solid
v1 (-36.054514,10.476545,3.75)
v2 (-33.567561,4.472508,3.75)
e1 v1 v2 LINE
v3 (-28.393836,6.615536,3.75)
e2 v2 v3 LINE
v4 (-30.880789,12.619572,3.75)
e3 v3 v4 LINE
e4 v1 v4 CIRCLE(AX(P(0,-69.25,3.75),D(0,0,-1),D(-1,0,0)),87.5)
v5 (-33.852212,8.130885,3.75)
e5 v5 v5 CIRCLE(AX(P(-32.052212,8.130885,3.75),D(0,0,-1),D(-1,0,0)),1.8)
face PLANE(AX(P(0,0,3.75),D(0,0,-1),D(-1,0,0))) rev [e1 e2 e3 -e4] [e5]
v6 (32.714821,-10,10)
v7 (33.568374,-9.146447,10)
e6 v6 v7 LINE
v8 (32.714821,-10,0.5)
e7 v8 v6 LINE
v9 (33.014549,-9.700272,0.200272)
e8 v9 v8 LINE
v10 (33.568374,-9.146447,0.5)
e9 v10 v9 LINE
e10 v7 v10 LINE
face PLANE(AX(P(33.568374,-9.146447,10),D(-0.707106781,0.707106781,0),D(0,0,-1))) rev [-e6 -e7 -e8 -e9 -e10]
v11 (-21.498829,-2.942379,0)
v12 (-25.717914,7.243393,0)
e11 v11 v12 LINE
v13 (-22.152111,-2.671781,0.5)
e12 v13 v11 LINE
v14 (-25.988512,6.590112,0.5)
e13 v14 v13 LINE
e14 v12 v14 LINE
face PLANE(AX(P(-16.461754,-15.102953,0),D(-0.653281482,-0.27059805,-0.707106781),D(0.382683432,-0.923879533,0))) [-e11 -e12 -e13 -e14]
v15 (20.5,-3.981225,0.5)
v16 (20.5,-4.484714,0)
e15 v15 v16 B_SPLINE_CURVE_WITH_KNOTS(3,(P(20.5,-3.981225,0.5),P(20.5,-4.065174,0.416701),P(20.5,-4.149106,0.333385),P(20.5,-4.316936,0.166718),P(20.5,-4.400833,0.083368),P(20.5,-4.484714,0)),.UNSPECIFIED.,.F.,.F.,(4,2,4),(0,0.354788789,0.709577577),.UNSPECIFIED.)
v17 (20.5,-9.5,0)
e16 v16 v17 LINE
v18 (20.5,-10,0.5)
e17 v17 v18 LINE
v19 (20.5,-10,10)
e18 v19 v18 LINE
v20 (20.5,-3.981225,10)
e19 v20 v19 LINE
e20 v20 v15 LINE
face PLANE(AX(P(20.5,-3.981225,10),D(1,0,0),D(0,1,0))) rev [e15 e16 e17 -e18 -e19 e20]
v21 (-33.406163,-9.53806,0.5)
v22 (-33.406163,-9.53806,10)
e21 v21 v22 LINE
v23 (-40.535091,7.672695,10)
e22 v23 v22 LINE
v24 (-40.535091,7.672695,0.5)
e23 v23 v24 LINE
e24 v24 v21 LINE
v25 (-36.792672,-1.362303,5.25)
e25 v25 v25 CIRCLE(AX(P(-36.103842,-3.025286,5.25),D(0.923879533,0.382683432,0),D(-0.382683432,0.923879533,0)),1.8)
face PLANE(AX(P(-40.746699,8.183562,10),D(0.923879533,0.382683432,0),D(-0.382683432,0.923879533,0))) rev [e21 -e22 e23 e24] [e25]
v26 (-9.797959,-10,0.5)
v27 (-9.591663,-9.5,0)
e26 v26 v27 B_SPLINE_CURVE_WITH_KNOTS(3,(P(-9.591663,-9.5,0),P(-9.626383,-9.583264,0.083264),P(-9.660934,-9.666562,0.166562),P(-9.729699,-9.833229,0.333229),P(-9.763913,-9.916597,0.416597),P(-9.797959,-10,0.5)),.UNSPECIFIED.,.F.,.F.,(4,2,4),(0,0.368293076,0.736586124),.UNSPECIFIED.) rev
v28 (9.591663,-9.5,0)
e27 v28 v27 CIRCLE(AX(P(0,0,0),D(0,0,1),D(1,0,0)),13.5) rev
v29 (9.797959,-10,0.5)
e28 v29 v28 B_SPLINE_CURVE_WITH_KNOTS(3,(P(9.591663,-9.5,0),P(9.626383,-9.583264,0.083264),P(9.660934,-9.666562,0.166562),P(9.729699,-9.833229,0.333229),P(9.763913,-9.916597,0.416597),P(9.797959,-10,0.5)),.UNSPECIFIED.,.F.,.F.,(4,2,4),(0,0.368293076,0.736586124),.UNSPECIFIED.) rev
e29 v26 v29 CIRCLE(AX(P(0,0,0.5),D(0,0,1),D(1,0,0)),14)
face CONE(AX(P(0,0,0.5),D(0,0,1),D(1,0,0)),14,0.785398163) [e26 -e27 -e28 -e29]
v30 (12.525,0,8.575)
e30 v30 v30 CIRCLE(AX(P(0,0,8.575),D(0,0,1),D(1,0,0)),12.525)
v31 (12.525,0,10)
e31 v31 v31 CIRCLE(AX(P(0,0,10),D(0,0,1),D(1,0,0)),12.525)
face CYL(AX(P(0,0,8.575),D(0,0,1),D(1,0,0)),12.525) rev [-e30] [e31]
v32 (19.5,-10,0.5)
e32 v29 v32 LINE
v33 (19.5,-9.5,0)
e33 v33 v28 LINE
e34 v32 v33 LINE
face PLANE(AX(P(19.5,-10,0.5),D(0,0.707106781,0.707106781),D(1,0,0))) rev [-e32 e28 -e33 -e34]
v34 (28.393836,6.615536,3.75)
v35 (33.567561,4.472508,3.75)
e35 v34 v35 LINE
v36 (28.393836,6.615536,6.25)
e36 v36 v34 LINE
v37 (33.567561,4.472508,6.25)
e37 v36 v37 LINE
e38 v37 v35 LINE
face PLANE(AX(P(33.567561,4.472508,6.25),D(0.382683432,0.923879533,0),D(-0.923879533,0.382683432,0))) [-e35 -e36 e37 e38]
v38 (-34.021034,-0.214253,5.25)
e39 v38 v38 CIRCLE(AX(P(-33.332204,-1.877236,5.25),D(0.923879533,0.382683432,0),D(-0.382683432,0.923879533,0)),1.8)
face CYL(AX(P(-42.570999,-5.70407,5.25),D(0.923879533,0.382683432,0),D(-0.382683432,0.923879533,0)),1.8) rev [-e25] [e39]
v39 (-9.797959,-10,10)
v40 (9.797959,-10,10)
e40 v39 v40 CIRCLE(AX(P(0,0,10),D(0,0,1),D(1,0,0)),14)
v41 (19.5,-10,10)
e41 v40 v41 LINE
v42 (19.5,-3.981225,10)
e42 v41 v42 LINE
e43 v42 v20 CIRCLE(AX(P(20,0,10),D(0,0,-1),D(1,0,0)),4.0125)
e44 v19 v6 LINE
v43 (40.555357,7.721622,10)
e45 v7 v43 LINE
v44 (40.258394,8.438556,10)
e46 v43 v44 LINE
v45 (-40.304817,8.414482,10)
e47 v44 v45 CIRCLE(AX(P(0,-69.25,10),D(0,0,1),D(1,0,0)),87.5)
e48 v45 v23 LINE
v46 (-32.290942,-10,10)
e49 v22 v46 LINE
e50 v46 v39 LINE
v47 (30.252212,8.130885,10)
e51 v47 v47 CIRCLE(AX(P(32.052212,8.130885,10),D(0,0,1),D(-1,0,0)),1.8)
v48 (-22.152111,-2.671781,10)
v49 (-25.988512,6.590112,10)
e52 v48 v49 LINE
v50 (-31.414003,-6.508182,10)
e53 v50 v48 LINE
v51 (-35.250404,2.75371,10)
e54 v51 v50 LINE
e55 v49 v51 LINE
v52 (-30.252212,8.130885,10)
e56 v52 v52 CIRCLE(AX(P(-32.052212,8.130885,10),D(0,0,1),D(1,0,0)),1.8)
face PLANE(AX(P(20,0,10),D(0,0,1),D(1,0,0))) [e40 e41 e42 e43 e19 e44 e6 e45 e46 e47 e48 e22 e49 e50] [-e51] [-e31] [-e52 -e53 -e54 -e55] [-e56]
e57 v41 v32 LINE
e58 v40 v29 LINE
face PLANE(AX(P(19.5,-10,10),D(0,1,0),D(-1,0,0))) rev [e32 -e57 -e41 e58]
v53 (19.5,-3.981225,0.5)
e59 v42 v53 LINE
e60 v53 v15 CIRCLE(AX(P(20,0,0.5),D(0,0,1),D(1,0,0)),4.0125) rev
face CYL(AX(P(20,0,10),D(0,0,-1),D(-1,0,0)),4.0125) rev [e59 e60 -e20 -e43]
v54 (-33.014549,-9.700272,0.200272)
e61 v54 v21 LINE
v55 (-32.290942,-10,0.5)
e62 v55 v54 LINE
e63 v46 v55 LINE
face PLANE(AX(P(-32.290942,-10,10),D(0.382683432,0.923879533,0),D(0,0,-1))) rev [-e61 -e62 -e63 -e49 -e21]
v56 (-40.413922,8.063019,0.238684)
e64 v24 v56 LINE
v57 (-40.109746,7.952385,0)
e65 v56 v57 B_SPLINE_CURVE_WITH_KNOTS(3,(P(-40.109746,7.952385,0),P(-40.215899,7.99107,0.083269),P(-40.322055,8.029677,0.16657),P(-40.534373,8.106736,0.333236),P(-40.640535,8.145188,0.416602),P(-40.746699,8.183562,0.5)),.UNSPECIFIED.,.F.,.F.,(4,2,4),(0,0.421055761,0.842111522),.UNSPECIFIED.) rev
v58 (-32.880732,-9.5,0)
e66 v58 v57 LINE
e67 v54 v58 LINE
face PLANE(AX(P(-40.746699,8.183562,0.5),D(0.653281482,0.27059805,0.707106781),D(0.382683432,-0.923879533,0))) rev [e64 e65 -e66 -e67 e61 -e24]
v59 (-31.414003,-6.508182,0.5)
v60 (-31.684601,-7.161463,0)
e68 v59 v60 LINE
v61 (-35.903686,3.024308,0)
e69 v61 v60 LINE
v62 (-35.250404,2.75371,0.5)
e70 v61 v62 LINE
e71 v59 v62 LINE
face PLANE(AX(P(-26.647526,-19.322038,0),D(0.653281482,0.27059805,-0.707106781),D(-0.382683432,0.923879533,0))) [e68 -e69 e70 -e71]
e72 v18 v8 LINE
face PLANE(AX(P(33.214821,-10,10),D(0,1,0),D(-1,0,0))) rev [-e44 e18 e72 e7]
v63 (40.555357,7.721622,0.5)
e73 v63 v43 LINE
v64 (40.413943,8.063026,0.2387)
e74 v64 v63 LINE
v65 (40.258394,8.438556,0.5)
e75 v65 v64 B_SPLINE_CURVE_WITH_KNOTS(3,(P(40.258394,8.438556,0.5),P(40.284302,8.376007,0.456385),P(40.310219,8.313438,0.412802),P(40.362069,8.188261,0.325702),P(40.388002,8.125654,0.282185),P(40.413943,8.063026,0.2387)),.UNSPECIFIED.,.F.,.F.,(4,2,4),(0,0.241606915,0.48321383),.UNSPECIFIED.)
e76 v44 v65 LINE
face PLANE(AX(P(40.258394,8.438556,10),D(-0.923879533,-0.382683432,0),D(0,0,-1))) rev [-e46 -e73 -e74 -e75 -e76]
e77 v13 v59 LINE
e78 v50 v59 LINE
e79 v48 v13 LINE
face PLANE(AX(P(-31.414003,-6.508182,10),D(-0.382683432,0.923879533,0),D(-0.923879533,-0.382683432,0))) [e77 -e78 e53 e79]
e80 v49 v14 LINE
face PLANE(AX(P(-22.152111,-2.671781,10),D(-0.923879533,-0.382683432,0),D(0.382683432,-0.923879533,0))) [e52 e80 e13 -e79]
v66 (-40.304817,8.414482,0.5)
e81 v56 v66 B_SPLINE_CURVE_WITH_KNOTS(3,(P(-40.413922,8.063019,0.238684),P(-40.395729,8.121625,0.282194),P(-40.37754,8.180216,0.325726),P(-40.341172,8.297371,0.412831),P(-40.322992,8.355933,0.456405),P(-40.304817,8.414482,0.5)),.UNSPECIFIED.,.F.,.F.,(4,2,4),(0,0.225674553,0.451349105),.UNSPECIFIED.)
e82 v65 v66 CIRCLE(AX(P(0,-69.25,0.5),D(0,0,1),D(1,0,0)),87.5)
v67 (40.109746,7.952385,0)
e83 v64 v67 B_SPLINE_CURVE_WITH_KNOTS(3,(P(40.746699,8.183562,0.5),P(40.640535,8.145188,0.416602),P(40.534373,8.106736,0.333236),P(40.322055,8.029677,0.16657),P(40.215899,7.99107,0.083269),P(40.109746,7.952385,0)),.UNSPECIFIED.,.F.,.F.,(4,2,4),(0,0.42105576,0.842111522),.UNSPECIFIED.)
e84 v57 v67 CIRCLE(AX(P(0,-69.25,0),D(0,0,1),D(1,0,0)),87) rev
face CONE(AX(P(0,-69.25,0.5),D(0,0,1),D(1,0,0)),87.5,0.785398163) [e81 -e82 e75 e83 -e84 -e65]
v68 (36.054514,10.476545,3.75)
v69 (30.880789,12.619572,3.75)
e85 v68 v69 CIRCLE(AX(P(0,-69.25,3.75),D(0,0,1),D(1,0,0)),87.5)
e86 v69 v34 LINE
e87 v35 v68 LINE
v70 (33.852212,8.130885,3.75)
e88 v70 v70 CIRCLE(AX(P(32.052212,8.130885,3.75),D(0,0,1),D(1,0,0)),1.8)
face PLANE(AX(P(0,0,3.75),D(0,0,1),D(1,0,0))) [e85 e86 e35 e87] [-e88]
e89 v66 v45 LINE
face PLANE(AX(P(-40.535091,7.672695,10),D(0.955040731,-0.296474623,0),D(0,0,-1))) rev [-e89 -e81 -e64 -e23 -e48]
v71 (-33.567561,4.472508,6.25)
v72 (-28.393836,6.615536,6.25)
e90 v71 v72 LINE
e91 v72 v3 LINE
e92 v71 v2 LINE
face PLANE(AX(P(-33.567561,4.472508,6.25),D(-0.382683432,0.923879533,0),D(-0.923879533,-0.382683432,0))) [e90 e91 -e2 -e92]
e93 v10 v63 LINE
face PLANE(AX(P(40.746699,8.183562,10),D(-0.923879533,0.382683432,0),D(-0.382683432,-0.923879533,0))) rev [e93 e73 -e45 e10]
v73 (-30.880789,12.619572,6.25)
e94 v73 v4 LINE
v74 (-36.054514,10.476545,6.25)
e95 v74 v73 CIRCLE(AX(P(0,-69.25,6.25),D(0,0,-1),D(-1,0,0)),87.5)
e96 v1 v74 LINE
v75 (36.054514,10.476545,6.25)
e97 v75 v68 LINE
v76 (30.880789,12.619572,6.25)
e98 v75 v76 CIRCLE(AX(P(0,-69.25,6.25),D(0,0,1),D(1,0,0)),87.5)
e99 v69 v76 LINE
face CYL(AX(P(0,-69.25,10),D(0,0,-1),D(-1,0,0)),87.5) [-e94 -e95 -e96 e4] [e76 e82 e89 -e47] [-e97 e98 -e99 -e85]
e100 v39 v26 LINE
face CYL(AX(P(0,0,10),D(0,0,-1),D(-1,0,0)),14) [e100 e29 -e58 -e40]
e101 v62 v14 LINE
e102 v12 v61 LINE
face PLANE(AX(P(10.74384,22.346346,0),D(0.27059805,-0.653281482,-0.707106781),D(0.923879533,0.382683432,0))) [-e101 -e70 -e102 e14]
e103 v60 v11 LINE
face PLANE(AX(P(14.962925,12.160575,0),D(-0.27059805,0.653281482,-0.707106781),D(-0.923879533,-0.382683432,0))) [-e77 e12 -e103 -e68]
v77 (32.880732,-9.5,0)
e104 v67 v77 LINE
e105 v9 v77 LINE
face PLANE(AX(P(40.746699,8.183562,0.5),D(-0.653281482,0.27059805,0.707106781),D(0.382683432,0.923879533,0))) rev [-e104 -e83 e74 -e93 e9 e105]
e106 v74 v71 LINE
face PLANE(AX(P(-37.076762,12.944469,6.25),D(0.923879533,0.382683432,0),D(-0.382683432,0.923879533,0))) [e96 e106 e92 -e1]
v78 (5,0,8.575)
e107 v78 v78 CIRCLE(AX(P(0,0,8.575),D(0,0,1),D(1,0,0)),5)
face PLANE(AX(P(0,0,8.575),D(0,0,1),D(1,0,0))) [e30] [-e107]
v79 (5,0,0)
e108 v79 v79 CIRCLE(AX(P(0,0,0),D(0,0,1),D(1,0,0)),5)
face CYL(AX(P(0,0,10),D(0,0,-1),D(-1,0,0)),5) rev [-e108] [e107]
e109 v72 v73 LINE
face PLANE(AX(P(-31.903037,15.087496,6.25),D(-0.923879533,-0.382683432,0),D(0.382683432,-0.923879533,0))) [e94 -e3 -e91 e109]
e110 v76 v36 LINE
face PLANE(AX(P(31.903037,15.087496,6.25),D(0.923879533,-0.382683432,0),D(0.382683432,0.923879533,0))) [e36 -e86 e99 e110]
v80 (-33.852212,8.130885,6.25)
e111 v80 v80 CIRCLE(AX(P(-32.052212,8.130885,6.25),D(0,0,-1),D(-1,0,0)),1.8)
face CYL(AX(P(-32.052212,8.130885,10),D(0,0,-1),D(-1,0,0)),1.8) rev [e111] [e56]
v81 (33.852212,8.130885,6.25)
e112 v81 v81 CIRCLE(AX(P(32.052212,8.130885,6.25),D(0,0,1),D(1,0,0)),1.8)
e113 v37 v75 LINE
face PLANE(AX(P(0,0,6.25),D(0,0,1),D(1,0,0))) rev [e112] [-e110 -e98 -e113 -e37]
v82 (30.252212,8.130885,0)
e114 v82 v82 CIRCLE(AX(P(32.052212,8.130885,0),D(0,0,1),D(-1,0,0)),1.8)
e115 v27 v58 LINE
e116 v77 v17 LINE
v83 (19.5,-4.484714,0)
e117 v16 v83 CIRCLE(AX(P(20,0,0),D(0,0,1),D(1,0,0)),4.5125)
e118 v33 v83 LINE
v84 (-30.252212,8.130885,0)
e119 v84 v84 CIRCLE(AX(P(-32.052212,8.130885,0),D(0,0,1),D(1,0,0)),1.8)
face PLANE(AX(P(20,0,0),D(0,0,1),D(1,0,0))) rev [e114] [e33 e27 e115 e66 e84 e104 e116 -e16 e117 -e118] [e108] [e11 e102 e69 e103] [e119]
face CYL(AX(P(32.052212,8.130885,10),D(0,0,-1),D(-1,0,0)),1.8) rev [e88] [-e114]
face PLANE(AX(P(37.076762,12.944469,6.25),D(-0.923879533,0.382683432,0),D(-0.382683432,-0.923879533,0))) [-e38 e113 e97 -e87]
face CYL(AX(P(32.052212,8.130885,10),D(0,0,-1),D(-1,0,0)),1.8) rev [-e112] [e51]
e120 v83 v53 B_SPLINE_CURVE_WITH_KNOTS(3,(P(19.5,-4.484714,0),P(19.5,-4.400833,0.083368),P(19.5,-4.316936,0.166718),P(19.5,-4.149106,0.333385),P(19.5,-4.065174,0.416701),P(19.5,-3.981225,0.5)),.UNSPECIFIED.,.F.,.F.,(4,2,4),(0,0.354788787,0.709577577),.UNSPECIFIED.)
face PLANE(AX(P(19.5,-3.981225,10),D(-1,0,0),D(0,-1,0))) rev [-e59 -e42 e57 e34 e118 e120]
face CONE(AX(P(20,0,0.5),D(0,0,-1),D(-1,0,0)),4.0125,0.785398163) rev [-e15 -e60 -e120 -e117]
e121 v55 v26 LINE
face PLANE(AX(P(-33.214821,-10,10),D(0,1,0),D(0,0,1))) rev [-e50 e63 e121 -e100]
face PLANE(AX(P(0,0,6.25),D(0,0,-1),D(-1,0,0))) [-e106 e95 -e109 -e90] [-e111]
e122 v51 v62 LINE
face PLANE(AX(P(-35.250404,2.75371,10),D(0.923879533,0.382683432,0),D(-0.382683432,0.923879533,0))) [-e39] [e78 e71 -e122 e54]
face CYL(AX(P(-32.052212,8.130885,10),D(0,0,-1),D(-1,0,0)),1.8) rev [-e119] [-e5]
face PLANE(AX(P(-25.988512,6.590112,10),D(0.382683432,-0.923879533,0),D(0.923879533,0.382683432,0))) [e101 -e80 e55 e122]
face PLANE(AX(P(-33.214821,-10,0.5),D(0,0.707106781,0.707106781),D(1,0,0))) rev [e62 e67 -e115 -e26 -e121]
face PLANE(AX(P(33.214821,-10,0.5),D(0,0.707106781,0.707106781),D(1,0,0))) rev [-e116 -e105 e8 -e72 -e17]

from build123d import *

# Parameters (mm, degrees)
SKETCH1_R           = 5
SKETCH1_R_2         = 1.8
BOSS_EXTRUDE1_DEPTH = 10
SKETCH2_R           = 12.525
CUT_EXTRUDE1_DEPTH  = 1.425
CHAMFER1_SIZE       = 0.5
CUT_EXTRUDE2_DEPTH  = 2.5
CHAMFER2_SIZE       = 0.5
SKETCH4_R           = 1.8
CUT_EXTRUDE3_DEPTH  = 10
CHAMFER3_SIZE       = 0.5
CHAMFER3_SIZE_2     = 0.923879533
CHAMFER3_SIZE_3     = 0.552958444


with BuildPart() as part:
    # Sketch1 → Boss-Extrude1 (new body)
    with BuildSketch(Plane.XY):
        with BuildLine():
            Line((-40.746699048, 8.183561953), (-33.214821075, -10))
            Line((-33.214821075, -10), (-9.797958971, -10))
            ThreePointArc((-9.797958971, -10), (0, -14), (9.797958971, -10))
            Line((9.797958971, -10), (19.5, -10))
            Line((19.5, -10), (19.5, -3.981225471))
            ThreePointArc((19.5, -3.981225471), (20, 4.0125), (20.5, -3.981225471))
            Line((20.5, -3.981225471), (20.5, -10))
            Line((20.5, -10), (33.214821075, -10))
            Line((33.214821075, -10), (40.746699048, 8.183561953))
            ThreePointArc((40.746699048, 8.183561953), (0, 18.25), (-40.746699048, 8.183561953))
        make_face()
        Circle(SKETCH1_R, mode=Mode.SUBTRACT)
        with Locations((-32.052211881, 8.130884627)):
            Circle(SKETCH1_R_2, mode=Mode.SUBTRACT)
        with Locations(Location((32.052211881, 8.130884627, 0), (0, 0, 180))):
            Circle(SKETCH1_R_2, mode=Mode.SUBTRACT)
        Polygon((-25.988511975, 6.5901118), (-35.250404289, 2.75371039), (-31.414002879, -6.508181923), (-22.152110566, -2.671780514), align=None, mode=Mode.SUBTRACT)
    extrude(amount=BOSS_EXTRUDE1_DEPTH)

    # Sketch2 → Cut-Extrude1 (cut)
    with BuildSketch(Plane.XY.offset(10)):
        Circle(SKETCH2_R)
    extrude(amount=-CUT_EXTRUDE1_DEPTH, mode=Mode.SUBTRACT)

    # Chamfer1
    chamfer1_edges = [part.edges().sort_by_distance(p)[0] for p in [
        (20, 4.0125, 0),
        (-24.070311271, 1.959165643, 0),
        (-30.619458132, 4.671911095, 0),
        (-33.332203584, -1.877235766, 0),
        (-26.783056723, -4.589981218, 0),
    ]]
    chamfer(chamfer1_edges, length=CHAMFER1_SIZE)

    # Sketch3 → Cut-Extrude2 (cut)
    with BuildSketch(Plane.XY.offset(3.75)):
        Polygon((-37.076762037, 12.944469155), (-33.567560961, 4.472508325), (-28.393835579, 6.615535546), (-31.903036655, 15.087496376), align=None)
        Polygon((37.076762037, 12.944469155), (33.567560961, 4.472508325), (28.393835579, 6.615535546), (31.903036655, 15.087496376), align=None)
    extrude(amount=CUT_EXTRUDE2_DEPTH, mode=Mode.SUBTRACT)

    # Chamfer2
    chamfer2_edges = [part.edges().sort_by_distance(p)[0] for p in [
        (14.648979486, -10, 0),
        (0, -14, 0),
        (-21.506390023, -10, 0),
        (-36.980760062, -0.908219024, 0),
        (0, 18.25, 0),
        (36.980760062, -0.908219024, 0),
        (26.857410538, -10, 0),
    ]]
    chamfer(chamfer2_edges, length=CHAMFER2_SIZE)

    # Sketch4 → Cut-Extrude3 (cut)
    with BuildSketch(Plane(origin=(-29.114518455, -12.059628406, 0), x_dir=(0, 0, -1), z_dir=(0.9238795325112882, 0.38268343236508634, 0))):
        with Locations(Location((-5.25, 11.021342374, 0), (0, 0, 90))):
            Circle(SKETCH4_R)
    extrude(amount=-CUT_EXTRUDE3_DEPTH, mode=Mode.SUBTRACT)

    # Chamfer3
    # the kernel refuses this chamfer: 0.923879533, 0.552958444, 0.5 mm, written as the material it takes off along each edge
    with BuildSketch(Plane(origin=(40.746699048, 8.183561953, -0.920037939), x_dir=(-0.38268343236508906, -0.923879532511287, 0), z_dir=(0, 0, 1))) as chamfer3_piece_1:
        with BuildLine():
            Line((CHAMFER3_SIZE, 0), (-0.048717445, -0.548717445))
            ThreePointArc((-0.048717445, -0.548717445), (-0.025540103, -0.282767493), (0, 0))
            Line((0, 0), (CHAMFER3_SIZE, 0))
        make_face()
    extrude(amount=12.340075878, mode=Mode.SUBTRACT)
    with BuildSketch(Plane(origin=(33.214821075, -10, -1.895315111), x_dir=(-1, 0, 0), z_dir=(0, 0, 1))) as chamfer3_piece_2:
        Polygon((CHAMFER3_SIZE, 0), (-CHAMFER3_SIZE_2 * 0.382683432163, -CHAMFER3_SIZE_2 * 0.923879532023), (0, 0), align=None)
    extrude(amount=14.290630221, mode=Mode.SUBTRACT)
    with BuildSketch(Plane(origin=(-33.214821075, -10, -1.895315111), x_dir=(1, 0, 0), z_dir=(0, 0, 1))) as chamfer3_piece_3:
        Polygon((CHAMFER3_SIZE_2, 0), (-CHAMFER3_SIZE * 0.382683432365, CHAMFER3_SIZE * 0.923879532511), (0, 0), align=None)
    extrude(amount=14.290630221, mode=Mode.SUBTRACT)
    with BuildSketch(Plane(origin=(-40.746699048, 8.183561953, -0.925350902), x_dir=(0.38268343236508684, -0.9238795325112881, 0), z_dir=(0, 0, 1))) as chamfer3_piece_4:
        with BuildLine():
            Line((CHAMFER3_SIZE_3, 0), (-0.04424113, 0.496614821))
            ThreePointArc((-0.04424113, 0.496614821), (-0.0231658, 0.256042208), (0, 0))
            Line((0, 0), (CHAMFER3_SIZE_3, 0))
        make_face()
    extrude(amount=12.350701805, mode=Mode.SUBTRACT)


solid = part.part
